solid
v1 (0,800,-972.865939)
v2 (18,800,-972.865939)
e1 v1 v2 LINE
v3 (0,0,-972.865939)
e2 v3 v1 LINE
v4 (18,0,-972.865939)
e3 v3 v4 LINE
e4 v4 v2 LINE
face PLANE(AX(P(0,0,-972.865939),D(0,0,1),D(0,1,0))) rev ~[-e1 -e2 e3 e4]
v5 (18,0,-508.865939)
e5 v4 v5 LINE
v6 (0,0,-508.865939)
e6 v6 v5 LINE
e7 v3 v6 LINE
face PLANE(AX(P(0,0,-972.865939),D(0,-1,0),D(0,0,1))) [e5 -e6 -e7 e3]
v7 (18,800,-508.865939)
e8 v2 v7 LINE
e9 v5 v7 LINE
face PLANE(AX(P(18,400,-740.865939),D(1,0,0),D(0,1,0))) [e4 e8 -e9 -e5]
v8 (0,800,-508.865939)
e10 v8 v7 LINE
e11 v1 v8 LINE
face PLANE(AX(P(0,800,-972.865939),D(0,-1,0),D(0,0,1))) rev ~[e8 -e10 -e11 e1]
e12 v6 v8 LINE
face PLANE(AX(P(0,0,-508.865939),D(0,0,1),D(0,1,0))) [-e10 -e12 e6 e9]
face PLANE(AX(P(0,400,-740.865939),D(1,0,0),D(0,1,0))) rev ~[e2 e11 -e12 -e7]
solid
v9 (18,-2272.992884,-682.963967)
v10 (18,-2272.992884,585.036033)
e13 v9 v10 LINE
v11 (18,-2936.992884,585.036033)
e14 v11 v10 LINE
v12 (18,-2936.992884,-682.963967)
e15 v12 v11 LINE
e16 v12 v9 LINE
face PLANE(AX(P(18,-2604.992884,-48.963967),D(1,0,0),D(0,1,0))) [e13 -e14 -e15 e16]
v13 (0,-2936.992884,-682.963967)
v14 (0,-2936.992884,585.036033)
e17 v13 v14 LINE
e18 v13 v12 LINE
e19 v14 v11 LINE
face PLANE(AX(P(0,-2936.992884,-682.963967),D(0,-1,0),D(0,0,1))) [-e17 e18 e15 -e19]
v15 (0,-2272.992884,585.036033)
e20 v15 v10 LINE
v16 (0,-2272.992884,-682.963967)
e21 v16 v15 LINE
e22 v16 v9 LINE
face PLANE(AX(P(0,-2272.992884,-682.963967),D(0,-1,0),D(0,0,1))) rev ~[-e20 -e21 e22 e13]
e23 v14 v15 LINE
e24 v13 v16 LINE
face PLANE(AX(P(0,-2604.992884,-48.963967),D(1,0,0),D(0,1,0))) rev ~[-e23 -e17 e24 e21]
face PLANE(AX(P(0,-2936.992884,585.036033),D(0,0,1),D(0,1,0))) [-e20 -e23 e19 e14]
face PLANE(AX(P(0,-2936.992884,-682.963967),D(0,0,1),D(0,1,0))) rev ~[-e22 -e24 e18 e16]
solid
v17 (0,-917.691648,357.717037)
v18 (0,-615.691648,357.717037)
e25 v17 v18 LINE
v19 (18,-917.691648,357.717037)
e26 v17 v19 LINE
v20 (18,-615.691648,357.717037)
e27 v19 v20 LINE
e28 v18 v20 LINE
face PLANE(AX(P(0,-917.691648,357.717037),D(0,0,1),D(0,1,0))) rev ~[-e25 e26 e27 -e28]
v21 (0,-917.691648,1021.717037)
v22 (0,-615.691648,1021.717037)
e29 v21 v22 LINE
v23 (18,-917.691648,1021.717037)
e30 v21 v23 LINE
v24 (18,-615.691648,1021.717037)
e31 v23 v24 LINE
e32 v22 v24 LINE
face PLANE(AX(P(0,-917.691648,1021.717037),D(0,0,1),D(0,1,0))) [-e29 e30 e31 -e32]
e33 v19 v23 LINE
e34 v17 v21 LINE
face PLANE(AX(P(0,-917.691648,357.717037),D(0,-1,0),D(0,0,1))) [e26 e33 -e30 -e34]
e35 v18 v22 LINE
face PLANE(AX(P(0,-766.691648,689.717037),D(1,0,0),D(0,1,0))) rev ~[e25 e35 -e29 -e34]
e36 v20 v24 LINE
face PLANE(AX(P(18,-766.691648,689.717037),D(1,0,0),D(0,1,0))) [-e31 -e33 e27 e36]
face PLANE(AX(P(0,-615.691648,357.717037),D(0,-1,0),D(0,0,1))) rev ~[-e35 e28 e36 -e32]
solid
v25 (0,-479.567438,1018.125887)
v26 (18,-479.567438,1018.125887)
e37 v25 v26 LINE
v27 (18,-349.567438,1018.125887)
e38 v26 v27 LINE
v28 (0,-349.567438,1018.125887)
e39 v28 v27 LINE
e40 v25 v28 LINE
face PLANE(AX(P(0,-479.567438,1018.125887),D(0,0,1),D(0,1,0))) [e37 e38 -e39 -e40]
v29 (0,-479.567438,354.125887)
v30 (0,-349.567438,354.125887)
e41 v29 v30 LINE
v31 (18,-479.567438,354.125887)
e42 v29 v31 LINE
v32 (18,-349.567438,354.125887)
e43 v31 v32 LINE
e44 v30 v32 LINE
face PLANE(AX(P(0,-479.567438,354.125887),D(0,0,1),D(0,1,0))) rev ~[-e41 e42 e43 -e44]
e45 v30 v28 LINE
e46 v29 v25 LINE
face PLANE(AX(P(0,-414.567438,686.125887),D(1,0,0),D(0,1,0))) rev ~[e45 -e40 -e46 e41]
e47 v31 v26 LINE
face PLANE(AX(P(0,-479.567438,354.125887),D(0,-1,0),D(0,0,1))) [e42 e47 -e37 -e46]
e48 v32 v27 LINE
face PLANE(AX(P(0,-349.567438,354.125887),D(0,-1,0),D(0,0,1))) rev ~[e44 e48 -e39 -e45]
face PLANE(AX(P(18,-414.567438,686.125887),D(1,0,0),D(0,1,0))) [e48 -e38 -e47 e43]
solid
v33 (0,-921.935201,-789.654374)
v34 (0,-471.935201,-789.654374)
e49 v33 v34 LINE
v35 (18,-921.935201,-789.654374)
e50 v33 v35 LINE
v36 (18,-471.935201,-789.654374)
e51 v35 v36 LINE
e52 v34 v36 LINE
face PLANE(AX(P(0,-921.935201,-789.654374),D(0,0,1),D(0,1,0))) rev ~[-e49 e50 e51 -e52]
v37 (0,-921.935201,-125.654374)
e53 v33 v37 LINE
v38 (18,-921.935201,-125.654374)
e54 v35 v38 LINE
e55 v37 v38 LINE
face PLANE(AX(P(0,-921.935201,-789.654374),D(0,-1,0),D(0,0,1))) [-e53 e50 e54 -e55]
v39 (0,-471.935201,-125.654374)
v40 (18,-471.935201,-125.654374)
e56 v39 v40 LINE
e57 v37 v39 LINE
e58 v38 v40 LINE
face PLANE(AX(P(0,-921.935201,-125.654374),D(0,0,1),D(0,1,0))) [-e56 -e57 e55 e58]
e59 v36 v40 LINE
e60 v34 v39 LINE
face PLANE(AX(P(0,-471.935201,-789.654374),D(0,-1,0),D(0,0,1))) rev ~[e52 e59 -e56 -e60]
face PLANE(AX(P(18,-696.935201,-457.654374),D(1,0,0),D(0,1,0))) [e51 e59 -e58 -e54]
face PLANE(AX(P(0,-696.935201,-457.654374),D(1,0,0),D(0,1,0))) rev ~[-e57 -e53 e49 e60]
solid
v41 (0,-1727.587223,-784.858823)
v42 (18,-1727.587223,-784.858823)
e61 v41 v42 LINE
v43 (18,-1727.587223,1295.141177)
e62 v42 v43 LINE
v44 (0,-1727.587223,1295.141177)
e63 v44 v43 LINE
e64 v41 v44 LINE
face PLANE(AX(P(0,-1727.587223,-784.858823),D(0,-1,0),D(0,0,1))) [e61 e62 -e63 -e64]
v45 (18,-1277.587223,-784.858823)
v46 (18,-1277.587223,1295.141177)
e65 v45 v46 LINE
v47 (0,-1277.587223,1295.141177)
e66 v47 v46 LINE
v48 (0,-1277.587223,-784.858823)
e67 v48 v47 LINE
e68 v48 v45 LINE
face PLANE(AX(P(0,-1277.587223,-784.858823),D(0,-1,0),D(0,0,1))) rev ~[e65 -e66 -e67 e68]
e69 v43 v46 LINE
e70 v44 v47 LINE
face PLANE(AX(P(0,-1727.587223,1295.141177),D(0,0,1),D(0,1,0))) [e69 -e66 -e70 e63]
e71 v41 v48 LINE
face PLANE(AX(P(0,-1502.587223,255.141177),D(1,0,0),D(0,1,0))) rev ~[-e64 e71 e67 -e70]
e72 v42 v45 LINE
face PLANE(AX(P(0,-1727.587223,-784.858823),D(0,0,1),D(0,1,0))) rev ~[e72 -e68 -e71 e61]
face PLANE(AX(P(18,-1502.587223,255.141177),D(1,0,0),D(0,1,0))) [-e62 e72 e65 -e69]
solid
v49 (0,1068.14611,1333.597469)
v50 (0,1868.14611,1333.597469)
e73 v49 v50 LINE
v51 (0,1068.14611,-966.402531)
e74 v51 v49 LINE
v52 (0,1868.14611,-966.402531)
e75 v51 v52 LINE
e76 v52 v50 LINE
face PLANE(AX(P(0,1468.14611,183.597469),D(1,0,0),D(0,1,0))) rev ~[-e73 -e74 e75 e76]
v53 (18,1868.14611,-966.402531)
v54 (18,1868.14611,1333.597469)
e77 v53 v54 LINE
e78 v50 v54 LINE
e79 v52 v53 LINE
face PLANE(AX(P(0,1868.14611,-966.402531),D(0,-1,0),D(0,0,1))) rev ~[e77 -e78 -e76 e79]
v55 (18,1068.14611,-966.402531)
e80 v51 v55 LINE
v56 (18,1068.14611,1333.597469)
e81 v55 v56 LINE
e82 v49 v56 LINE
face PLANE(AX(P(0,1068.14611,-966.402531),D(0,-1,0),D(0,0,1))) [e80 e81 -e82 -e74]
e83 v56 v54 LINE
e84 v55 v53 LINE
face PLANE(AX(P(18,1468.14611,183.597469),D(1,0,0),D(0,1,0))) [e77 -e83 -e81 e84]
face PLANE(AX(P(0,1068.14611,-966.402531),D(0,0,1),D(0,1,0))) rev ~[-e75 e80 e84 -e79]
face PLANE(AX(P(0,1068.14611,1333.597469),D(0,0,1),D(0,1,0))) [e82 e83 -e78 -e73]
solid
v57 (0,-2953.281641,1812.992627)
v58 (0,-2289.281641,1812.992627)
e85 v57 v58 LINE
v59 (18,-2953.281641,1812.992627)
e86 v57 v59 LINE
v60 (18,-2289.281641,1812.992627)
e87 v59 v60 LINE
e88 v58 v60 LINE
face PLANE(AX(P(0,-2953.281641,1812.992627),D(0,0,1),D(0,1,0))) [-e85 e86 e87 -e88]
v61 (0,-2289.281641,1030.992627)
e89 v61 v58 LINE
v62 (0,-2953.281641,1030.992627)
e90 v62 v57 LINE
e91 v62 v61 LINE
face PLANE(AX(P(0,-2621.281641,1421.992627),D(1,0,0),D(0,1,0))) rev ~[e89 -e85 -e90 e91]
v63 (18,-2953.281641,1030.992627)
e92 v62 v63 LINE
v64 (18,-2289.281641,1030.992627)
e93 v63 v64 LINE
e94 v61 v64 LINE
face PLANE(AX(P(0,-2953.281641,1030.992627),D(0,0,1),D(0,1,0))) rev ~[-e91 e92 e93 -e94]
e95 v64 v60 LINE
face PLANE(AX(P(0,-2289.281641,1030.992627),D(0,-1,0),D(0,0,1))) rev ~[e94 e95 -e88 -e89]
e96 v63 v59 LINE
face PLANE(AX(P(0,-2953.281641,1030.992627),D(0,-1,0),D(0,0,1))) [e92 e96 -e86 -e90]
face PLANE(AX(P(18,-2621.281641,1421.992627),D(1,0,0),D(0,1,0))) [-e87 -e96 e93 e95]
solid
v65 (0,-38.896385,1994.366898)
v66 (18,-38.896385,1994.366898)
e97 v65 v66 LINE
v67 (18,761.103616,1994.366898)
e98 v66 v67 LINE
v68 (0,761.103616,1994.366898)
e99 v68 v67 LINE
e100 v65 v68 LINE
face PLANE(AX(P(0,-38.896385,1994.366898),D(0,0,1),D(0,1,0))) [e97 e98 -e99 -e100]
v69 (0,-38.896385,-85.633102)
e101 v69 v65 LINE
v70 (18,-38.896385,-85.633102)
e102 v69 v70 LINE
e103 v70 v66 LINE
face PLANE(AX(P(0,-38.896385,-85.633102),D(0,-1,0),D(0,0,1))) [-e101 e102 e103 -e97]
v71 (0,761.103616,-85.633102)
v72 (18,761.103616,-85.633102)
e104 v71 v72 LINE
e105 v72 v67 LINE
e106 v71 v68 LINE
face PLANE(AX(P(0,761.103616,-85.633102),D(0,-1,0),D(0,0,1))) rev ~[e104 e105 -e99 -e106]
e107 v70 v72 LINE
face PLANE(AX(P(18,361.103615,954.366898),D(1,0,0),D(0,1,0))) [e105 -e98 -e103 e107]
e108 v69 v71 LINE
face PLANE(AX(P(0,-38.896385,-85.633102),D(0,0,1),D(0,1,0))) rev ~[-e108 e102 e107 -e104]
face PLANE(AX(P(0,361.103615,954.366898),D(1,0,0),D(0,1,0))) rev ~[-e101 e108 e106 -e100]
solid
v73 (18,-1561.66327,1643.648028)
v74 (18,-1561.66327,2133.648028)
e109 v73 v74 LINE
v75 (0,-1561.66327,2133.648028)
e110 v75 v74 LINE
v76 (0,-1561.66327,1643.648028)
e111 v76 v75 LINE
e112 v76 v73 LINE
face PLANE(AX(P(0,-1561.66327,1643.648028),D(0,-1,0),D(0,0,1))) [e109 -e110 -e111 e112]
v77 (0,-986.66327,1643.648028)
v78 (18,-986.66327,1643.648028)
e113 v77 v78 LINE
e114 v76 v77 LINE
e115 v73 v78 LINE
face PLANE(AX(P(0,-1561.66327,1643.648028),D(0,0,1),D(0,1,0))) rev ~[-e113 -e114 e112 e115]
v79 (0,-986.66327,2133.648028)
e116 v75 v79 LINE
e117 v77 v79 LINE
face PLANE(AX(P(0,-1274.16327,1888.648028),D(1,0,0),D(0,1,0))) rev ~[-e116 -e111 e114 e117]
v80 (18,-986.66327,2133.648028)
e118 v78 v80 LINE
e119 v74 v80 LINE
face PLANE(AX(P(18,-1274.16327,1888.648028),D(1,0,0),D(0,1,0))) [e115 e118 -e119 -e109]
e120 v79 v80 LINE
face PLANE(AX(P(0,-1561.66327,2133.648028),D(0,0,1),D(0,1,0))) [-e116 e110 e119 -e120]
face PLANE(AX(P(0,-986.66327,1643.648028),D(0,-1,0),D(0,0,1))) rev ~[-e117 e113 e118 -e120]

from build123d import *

# Parameters (mm, degrees)
F0_W     = 450
F0_H     = 2080
F1_DEPTH = 18
F0_H_2   = 664
F0_W_2   = 800
F0_H_3   = 2300
F0_W_3   = 664
F0_H_4   = 1268
F0_H_5   = 464
F0_H_6   = 782
F0_W_4   = 302
F0_W_5   = 130
F0_W_6   = 575
F0_H_7   = 490


# Not quite as in the source:
# - a feature names something its author has since deleted; it is built from what else it names


with BuildPart() as f1:
    # F0 (on Right) → F1 (new body)
    with BuildSketch(Plane.YZ):
        with Locations((-1502.587223053, 255.1411771774)):
            Rectangle(F0_W, F0_H)
    extrude(amount=F1_DEPTH)


with BuildPart() as f1b:
    # F0 (on Right) → F1, piece 2 (new body)
    with BuildSketch(Plane.YZ):
        with Locations((-696.9352006912, -457.6543741226)):
            Rectangle(F0_W, F0_H_2)
    extrude(amount=F1_DEPTH)


with BuildPart() as f1c:
    # F0 (on Right) → F1, piece 3 (new body)
    with BuildSketch(Plane.YZ):
        with Locations((361.1036155, 954.3668979353)):
            Rectangle(F0_W_2, F0_H)
    extrude(amount=F1_DEPTH)


with BuildPart() as f1d:
    # F0 (on Right) → F1, piece 4 (new body)
    with BuildSketch(Plane.YZ):
        with Locations((1468.146109581, 183.5974693298)):
            Rectangle(F0_W_2, F0_H_3)
    extrude(amount=F1_DEPTH)


with BuildPart() as f1e:
    # F0 (on Right) → F1, piece 5 (new body)
    with BuildSketch(Plane.YZ):
        with Locations((-2604.9928836823, -48.9639673233)):
            Rectangle(F0_W_3, F0_H_4)
    extrude(amount=F1_DEPTH)


with BuildPart() as f1f:
    # F0 (on Right) → F1, piece 6 (new body)
    with BuildSketch(Plane.YZ):
        with Locations((400, -740.8659391403)):
            Rectangle(F0_W_2, F0_H_5)
    extrude(amount=F1_DEPTH)


with BuildPart() as f1g:
    # F0 (on Right) → F1, piece 7 (new body)
    with BuildSketch(Plane.YZ):
        with Locations((-2621.2816410065, 1421.9926271439)):
            Rectangle(F0_W_3, F0_H_6)
    extrude(amount=F1_DEPTH)


with BuildPart() as f1h:
    # F0 (on Right) → F1, piece 8 (new body)
    with BuildSketch(Plane.YZ):
        with Locations((-766.6916480064, 689.7170372009)):
            Rectangle(F0_W_4, F0_H_2)
    extrude(amount=F1_DEPTH)


with BuildPart() as f1i:
    # F0 (on Right) → F1, piece 9 (new body)
    with BuildSketch(Plane.YZ):
        with Locations((-414.567438364, 686.1258871555)):
            Rectangle(F0_W_5, F0_H_2)
    extrude(amount=F1_DEPTH)


with BuildPart() as f1j:
    # F0 (on Right) → F1, piece 10 (new body)
    with BuildSketch(Plane.YZ):
        with Locations((-1274.1632699966, 1888.6480283737)):
            Rectangle(F0_W_6, F0_H_7)
    extrude(amount=F1_DEPTH)


solid = Compound([f1.part, f1b.part, f1c.part, f1d.part, f1e.part, f1f.part, f1g.part, f1h.part, f1i.part, f1j.part])
